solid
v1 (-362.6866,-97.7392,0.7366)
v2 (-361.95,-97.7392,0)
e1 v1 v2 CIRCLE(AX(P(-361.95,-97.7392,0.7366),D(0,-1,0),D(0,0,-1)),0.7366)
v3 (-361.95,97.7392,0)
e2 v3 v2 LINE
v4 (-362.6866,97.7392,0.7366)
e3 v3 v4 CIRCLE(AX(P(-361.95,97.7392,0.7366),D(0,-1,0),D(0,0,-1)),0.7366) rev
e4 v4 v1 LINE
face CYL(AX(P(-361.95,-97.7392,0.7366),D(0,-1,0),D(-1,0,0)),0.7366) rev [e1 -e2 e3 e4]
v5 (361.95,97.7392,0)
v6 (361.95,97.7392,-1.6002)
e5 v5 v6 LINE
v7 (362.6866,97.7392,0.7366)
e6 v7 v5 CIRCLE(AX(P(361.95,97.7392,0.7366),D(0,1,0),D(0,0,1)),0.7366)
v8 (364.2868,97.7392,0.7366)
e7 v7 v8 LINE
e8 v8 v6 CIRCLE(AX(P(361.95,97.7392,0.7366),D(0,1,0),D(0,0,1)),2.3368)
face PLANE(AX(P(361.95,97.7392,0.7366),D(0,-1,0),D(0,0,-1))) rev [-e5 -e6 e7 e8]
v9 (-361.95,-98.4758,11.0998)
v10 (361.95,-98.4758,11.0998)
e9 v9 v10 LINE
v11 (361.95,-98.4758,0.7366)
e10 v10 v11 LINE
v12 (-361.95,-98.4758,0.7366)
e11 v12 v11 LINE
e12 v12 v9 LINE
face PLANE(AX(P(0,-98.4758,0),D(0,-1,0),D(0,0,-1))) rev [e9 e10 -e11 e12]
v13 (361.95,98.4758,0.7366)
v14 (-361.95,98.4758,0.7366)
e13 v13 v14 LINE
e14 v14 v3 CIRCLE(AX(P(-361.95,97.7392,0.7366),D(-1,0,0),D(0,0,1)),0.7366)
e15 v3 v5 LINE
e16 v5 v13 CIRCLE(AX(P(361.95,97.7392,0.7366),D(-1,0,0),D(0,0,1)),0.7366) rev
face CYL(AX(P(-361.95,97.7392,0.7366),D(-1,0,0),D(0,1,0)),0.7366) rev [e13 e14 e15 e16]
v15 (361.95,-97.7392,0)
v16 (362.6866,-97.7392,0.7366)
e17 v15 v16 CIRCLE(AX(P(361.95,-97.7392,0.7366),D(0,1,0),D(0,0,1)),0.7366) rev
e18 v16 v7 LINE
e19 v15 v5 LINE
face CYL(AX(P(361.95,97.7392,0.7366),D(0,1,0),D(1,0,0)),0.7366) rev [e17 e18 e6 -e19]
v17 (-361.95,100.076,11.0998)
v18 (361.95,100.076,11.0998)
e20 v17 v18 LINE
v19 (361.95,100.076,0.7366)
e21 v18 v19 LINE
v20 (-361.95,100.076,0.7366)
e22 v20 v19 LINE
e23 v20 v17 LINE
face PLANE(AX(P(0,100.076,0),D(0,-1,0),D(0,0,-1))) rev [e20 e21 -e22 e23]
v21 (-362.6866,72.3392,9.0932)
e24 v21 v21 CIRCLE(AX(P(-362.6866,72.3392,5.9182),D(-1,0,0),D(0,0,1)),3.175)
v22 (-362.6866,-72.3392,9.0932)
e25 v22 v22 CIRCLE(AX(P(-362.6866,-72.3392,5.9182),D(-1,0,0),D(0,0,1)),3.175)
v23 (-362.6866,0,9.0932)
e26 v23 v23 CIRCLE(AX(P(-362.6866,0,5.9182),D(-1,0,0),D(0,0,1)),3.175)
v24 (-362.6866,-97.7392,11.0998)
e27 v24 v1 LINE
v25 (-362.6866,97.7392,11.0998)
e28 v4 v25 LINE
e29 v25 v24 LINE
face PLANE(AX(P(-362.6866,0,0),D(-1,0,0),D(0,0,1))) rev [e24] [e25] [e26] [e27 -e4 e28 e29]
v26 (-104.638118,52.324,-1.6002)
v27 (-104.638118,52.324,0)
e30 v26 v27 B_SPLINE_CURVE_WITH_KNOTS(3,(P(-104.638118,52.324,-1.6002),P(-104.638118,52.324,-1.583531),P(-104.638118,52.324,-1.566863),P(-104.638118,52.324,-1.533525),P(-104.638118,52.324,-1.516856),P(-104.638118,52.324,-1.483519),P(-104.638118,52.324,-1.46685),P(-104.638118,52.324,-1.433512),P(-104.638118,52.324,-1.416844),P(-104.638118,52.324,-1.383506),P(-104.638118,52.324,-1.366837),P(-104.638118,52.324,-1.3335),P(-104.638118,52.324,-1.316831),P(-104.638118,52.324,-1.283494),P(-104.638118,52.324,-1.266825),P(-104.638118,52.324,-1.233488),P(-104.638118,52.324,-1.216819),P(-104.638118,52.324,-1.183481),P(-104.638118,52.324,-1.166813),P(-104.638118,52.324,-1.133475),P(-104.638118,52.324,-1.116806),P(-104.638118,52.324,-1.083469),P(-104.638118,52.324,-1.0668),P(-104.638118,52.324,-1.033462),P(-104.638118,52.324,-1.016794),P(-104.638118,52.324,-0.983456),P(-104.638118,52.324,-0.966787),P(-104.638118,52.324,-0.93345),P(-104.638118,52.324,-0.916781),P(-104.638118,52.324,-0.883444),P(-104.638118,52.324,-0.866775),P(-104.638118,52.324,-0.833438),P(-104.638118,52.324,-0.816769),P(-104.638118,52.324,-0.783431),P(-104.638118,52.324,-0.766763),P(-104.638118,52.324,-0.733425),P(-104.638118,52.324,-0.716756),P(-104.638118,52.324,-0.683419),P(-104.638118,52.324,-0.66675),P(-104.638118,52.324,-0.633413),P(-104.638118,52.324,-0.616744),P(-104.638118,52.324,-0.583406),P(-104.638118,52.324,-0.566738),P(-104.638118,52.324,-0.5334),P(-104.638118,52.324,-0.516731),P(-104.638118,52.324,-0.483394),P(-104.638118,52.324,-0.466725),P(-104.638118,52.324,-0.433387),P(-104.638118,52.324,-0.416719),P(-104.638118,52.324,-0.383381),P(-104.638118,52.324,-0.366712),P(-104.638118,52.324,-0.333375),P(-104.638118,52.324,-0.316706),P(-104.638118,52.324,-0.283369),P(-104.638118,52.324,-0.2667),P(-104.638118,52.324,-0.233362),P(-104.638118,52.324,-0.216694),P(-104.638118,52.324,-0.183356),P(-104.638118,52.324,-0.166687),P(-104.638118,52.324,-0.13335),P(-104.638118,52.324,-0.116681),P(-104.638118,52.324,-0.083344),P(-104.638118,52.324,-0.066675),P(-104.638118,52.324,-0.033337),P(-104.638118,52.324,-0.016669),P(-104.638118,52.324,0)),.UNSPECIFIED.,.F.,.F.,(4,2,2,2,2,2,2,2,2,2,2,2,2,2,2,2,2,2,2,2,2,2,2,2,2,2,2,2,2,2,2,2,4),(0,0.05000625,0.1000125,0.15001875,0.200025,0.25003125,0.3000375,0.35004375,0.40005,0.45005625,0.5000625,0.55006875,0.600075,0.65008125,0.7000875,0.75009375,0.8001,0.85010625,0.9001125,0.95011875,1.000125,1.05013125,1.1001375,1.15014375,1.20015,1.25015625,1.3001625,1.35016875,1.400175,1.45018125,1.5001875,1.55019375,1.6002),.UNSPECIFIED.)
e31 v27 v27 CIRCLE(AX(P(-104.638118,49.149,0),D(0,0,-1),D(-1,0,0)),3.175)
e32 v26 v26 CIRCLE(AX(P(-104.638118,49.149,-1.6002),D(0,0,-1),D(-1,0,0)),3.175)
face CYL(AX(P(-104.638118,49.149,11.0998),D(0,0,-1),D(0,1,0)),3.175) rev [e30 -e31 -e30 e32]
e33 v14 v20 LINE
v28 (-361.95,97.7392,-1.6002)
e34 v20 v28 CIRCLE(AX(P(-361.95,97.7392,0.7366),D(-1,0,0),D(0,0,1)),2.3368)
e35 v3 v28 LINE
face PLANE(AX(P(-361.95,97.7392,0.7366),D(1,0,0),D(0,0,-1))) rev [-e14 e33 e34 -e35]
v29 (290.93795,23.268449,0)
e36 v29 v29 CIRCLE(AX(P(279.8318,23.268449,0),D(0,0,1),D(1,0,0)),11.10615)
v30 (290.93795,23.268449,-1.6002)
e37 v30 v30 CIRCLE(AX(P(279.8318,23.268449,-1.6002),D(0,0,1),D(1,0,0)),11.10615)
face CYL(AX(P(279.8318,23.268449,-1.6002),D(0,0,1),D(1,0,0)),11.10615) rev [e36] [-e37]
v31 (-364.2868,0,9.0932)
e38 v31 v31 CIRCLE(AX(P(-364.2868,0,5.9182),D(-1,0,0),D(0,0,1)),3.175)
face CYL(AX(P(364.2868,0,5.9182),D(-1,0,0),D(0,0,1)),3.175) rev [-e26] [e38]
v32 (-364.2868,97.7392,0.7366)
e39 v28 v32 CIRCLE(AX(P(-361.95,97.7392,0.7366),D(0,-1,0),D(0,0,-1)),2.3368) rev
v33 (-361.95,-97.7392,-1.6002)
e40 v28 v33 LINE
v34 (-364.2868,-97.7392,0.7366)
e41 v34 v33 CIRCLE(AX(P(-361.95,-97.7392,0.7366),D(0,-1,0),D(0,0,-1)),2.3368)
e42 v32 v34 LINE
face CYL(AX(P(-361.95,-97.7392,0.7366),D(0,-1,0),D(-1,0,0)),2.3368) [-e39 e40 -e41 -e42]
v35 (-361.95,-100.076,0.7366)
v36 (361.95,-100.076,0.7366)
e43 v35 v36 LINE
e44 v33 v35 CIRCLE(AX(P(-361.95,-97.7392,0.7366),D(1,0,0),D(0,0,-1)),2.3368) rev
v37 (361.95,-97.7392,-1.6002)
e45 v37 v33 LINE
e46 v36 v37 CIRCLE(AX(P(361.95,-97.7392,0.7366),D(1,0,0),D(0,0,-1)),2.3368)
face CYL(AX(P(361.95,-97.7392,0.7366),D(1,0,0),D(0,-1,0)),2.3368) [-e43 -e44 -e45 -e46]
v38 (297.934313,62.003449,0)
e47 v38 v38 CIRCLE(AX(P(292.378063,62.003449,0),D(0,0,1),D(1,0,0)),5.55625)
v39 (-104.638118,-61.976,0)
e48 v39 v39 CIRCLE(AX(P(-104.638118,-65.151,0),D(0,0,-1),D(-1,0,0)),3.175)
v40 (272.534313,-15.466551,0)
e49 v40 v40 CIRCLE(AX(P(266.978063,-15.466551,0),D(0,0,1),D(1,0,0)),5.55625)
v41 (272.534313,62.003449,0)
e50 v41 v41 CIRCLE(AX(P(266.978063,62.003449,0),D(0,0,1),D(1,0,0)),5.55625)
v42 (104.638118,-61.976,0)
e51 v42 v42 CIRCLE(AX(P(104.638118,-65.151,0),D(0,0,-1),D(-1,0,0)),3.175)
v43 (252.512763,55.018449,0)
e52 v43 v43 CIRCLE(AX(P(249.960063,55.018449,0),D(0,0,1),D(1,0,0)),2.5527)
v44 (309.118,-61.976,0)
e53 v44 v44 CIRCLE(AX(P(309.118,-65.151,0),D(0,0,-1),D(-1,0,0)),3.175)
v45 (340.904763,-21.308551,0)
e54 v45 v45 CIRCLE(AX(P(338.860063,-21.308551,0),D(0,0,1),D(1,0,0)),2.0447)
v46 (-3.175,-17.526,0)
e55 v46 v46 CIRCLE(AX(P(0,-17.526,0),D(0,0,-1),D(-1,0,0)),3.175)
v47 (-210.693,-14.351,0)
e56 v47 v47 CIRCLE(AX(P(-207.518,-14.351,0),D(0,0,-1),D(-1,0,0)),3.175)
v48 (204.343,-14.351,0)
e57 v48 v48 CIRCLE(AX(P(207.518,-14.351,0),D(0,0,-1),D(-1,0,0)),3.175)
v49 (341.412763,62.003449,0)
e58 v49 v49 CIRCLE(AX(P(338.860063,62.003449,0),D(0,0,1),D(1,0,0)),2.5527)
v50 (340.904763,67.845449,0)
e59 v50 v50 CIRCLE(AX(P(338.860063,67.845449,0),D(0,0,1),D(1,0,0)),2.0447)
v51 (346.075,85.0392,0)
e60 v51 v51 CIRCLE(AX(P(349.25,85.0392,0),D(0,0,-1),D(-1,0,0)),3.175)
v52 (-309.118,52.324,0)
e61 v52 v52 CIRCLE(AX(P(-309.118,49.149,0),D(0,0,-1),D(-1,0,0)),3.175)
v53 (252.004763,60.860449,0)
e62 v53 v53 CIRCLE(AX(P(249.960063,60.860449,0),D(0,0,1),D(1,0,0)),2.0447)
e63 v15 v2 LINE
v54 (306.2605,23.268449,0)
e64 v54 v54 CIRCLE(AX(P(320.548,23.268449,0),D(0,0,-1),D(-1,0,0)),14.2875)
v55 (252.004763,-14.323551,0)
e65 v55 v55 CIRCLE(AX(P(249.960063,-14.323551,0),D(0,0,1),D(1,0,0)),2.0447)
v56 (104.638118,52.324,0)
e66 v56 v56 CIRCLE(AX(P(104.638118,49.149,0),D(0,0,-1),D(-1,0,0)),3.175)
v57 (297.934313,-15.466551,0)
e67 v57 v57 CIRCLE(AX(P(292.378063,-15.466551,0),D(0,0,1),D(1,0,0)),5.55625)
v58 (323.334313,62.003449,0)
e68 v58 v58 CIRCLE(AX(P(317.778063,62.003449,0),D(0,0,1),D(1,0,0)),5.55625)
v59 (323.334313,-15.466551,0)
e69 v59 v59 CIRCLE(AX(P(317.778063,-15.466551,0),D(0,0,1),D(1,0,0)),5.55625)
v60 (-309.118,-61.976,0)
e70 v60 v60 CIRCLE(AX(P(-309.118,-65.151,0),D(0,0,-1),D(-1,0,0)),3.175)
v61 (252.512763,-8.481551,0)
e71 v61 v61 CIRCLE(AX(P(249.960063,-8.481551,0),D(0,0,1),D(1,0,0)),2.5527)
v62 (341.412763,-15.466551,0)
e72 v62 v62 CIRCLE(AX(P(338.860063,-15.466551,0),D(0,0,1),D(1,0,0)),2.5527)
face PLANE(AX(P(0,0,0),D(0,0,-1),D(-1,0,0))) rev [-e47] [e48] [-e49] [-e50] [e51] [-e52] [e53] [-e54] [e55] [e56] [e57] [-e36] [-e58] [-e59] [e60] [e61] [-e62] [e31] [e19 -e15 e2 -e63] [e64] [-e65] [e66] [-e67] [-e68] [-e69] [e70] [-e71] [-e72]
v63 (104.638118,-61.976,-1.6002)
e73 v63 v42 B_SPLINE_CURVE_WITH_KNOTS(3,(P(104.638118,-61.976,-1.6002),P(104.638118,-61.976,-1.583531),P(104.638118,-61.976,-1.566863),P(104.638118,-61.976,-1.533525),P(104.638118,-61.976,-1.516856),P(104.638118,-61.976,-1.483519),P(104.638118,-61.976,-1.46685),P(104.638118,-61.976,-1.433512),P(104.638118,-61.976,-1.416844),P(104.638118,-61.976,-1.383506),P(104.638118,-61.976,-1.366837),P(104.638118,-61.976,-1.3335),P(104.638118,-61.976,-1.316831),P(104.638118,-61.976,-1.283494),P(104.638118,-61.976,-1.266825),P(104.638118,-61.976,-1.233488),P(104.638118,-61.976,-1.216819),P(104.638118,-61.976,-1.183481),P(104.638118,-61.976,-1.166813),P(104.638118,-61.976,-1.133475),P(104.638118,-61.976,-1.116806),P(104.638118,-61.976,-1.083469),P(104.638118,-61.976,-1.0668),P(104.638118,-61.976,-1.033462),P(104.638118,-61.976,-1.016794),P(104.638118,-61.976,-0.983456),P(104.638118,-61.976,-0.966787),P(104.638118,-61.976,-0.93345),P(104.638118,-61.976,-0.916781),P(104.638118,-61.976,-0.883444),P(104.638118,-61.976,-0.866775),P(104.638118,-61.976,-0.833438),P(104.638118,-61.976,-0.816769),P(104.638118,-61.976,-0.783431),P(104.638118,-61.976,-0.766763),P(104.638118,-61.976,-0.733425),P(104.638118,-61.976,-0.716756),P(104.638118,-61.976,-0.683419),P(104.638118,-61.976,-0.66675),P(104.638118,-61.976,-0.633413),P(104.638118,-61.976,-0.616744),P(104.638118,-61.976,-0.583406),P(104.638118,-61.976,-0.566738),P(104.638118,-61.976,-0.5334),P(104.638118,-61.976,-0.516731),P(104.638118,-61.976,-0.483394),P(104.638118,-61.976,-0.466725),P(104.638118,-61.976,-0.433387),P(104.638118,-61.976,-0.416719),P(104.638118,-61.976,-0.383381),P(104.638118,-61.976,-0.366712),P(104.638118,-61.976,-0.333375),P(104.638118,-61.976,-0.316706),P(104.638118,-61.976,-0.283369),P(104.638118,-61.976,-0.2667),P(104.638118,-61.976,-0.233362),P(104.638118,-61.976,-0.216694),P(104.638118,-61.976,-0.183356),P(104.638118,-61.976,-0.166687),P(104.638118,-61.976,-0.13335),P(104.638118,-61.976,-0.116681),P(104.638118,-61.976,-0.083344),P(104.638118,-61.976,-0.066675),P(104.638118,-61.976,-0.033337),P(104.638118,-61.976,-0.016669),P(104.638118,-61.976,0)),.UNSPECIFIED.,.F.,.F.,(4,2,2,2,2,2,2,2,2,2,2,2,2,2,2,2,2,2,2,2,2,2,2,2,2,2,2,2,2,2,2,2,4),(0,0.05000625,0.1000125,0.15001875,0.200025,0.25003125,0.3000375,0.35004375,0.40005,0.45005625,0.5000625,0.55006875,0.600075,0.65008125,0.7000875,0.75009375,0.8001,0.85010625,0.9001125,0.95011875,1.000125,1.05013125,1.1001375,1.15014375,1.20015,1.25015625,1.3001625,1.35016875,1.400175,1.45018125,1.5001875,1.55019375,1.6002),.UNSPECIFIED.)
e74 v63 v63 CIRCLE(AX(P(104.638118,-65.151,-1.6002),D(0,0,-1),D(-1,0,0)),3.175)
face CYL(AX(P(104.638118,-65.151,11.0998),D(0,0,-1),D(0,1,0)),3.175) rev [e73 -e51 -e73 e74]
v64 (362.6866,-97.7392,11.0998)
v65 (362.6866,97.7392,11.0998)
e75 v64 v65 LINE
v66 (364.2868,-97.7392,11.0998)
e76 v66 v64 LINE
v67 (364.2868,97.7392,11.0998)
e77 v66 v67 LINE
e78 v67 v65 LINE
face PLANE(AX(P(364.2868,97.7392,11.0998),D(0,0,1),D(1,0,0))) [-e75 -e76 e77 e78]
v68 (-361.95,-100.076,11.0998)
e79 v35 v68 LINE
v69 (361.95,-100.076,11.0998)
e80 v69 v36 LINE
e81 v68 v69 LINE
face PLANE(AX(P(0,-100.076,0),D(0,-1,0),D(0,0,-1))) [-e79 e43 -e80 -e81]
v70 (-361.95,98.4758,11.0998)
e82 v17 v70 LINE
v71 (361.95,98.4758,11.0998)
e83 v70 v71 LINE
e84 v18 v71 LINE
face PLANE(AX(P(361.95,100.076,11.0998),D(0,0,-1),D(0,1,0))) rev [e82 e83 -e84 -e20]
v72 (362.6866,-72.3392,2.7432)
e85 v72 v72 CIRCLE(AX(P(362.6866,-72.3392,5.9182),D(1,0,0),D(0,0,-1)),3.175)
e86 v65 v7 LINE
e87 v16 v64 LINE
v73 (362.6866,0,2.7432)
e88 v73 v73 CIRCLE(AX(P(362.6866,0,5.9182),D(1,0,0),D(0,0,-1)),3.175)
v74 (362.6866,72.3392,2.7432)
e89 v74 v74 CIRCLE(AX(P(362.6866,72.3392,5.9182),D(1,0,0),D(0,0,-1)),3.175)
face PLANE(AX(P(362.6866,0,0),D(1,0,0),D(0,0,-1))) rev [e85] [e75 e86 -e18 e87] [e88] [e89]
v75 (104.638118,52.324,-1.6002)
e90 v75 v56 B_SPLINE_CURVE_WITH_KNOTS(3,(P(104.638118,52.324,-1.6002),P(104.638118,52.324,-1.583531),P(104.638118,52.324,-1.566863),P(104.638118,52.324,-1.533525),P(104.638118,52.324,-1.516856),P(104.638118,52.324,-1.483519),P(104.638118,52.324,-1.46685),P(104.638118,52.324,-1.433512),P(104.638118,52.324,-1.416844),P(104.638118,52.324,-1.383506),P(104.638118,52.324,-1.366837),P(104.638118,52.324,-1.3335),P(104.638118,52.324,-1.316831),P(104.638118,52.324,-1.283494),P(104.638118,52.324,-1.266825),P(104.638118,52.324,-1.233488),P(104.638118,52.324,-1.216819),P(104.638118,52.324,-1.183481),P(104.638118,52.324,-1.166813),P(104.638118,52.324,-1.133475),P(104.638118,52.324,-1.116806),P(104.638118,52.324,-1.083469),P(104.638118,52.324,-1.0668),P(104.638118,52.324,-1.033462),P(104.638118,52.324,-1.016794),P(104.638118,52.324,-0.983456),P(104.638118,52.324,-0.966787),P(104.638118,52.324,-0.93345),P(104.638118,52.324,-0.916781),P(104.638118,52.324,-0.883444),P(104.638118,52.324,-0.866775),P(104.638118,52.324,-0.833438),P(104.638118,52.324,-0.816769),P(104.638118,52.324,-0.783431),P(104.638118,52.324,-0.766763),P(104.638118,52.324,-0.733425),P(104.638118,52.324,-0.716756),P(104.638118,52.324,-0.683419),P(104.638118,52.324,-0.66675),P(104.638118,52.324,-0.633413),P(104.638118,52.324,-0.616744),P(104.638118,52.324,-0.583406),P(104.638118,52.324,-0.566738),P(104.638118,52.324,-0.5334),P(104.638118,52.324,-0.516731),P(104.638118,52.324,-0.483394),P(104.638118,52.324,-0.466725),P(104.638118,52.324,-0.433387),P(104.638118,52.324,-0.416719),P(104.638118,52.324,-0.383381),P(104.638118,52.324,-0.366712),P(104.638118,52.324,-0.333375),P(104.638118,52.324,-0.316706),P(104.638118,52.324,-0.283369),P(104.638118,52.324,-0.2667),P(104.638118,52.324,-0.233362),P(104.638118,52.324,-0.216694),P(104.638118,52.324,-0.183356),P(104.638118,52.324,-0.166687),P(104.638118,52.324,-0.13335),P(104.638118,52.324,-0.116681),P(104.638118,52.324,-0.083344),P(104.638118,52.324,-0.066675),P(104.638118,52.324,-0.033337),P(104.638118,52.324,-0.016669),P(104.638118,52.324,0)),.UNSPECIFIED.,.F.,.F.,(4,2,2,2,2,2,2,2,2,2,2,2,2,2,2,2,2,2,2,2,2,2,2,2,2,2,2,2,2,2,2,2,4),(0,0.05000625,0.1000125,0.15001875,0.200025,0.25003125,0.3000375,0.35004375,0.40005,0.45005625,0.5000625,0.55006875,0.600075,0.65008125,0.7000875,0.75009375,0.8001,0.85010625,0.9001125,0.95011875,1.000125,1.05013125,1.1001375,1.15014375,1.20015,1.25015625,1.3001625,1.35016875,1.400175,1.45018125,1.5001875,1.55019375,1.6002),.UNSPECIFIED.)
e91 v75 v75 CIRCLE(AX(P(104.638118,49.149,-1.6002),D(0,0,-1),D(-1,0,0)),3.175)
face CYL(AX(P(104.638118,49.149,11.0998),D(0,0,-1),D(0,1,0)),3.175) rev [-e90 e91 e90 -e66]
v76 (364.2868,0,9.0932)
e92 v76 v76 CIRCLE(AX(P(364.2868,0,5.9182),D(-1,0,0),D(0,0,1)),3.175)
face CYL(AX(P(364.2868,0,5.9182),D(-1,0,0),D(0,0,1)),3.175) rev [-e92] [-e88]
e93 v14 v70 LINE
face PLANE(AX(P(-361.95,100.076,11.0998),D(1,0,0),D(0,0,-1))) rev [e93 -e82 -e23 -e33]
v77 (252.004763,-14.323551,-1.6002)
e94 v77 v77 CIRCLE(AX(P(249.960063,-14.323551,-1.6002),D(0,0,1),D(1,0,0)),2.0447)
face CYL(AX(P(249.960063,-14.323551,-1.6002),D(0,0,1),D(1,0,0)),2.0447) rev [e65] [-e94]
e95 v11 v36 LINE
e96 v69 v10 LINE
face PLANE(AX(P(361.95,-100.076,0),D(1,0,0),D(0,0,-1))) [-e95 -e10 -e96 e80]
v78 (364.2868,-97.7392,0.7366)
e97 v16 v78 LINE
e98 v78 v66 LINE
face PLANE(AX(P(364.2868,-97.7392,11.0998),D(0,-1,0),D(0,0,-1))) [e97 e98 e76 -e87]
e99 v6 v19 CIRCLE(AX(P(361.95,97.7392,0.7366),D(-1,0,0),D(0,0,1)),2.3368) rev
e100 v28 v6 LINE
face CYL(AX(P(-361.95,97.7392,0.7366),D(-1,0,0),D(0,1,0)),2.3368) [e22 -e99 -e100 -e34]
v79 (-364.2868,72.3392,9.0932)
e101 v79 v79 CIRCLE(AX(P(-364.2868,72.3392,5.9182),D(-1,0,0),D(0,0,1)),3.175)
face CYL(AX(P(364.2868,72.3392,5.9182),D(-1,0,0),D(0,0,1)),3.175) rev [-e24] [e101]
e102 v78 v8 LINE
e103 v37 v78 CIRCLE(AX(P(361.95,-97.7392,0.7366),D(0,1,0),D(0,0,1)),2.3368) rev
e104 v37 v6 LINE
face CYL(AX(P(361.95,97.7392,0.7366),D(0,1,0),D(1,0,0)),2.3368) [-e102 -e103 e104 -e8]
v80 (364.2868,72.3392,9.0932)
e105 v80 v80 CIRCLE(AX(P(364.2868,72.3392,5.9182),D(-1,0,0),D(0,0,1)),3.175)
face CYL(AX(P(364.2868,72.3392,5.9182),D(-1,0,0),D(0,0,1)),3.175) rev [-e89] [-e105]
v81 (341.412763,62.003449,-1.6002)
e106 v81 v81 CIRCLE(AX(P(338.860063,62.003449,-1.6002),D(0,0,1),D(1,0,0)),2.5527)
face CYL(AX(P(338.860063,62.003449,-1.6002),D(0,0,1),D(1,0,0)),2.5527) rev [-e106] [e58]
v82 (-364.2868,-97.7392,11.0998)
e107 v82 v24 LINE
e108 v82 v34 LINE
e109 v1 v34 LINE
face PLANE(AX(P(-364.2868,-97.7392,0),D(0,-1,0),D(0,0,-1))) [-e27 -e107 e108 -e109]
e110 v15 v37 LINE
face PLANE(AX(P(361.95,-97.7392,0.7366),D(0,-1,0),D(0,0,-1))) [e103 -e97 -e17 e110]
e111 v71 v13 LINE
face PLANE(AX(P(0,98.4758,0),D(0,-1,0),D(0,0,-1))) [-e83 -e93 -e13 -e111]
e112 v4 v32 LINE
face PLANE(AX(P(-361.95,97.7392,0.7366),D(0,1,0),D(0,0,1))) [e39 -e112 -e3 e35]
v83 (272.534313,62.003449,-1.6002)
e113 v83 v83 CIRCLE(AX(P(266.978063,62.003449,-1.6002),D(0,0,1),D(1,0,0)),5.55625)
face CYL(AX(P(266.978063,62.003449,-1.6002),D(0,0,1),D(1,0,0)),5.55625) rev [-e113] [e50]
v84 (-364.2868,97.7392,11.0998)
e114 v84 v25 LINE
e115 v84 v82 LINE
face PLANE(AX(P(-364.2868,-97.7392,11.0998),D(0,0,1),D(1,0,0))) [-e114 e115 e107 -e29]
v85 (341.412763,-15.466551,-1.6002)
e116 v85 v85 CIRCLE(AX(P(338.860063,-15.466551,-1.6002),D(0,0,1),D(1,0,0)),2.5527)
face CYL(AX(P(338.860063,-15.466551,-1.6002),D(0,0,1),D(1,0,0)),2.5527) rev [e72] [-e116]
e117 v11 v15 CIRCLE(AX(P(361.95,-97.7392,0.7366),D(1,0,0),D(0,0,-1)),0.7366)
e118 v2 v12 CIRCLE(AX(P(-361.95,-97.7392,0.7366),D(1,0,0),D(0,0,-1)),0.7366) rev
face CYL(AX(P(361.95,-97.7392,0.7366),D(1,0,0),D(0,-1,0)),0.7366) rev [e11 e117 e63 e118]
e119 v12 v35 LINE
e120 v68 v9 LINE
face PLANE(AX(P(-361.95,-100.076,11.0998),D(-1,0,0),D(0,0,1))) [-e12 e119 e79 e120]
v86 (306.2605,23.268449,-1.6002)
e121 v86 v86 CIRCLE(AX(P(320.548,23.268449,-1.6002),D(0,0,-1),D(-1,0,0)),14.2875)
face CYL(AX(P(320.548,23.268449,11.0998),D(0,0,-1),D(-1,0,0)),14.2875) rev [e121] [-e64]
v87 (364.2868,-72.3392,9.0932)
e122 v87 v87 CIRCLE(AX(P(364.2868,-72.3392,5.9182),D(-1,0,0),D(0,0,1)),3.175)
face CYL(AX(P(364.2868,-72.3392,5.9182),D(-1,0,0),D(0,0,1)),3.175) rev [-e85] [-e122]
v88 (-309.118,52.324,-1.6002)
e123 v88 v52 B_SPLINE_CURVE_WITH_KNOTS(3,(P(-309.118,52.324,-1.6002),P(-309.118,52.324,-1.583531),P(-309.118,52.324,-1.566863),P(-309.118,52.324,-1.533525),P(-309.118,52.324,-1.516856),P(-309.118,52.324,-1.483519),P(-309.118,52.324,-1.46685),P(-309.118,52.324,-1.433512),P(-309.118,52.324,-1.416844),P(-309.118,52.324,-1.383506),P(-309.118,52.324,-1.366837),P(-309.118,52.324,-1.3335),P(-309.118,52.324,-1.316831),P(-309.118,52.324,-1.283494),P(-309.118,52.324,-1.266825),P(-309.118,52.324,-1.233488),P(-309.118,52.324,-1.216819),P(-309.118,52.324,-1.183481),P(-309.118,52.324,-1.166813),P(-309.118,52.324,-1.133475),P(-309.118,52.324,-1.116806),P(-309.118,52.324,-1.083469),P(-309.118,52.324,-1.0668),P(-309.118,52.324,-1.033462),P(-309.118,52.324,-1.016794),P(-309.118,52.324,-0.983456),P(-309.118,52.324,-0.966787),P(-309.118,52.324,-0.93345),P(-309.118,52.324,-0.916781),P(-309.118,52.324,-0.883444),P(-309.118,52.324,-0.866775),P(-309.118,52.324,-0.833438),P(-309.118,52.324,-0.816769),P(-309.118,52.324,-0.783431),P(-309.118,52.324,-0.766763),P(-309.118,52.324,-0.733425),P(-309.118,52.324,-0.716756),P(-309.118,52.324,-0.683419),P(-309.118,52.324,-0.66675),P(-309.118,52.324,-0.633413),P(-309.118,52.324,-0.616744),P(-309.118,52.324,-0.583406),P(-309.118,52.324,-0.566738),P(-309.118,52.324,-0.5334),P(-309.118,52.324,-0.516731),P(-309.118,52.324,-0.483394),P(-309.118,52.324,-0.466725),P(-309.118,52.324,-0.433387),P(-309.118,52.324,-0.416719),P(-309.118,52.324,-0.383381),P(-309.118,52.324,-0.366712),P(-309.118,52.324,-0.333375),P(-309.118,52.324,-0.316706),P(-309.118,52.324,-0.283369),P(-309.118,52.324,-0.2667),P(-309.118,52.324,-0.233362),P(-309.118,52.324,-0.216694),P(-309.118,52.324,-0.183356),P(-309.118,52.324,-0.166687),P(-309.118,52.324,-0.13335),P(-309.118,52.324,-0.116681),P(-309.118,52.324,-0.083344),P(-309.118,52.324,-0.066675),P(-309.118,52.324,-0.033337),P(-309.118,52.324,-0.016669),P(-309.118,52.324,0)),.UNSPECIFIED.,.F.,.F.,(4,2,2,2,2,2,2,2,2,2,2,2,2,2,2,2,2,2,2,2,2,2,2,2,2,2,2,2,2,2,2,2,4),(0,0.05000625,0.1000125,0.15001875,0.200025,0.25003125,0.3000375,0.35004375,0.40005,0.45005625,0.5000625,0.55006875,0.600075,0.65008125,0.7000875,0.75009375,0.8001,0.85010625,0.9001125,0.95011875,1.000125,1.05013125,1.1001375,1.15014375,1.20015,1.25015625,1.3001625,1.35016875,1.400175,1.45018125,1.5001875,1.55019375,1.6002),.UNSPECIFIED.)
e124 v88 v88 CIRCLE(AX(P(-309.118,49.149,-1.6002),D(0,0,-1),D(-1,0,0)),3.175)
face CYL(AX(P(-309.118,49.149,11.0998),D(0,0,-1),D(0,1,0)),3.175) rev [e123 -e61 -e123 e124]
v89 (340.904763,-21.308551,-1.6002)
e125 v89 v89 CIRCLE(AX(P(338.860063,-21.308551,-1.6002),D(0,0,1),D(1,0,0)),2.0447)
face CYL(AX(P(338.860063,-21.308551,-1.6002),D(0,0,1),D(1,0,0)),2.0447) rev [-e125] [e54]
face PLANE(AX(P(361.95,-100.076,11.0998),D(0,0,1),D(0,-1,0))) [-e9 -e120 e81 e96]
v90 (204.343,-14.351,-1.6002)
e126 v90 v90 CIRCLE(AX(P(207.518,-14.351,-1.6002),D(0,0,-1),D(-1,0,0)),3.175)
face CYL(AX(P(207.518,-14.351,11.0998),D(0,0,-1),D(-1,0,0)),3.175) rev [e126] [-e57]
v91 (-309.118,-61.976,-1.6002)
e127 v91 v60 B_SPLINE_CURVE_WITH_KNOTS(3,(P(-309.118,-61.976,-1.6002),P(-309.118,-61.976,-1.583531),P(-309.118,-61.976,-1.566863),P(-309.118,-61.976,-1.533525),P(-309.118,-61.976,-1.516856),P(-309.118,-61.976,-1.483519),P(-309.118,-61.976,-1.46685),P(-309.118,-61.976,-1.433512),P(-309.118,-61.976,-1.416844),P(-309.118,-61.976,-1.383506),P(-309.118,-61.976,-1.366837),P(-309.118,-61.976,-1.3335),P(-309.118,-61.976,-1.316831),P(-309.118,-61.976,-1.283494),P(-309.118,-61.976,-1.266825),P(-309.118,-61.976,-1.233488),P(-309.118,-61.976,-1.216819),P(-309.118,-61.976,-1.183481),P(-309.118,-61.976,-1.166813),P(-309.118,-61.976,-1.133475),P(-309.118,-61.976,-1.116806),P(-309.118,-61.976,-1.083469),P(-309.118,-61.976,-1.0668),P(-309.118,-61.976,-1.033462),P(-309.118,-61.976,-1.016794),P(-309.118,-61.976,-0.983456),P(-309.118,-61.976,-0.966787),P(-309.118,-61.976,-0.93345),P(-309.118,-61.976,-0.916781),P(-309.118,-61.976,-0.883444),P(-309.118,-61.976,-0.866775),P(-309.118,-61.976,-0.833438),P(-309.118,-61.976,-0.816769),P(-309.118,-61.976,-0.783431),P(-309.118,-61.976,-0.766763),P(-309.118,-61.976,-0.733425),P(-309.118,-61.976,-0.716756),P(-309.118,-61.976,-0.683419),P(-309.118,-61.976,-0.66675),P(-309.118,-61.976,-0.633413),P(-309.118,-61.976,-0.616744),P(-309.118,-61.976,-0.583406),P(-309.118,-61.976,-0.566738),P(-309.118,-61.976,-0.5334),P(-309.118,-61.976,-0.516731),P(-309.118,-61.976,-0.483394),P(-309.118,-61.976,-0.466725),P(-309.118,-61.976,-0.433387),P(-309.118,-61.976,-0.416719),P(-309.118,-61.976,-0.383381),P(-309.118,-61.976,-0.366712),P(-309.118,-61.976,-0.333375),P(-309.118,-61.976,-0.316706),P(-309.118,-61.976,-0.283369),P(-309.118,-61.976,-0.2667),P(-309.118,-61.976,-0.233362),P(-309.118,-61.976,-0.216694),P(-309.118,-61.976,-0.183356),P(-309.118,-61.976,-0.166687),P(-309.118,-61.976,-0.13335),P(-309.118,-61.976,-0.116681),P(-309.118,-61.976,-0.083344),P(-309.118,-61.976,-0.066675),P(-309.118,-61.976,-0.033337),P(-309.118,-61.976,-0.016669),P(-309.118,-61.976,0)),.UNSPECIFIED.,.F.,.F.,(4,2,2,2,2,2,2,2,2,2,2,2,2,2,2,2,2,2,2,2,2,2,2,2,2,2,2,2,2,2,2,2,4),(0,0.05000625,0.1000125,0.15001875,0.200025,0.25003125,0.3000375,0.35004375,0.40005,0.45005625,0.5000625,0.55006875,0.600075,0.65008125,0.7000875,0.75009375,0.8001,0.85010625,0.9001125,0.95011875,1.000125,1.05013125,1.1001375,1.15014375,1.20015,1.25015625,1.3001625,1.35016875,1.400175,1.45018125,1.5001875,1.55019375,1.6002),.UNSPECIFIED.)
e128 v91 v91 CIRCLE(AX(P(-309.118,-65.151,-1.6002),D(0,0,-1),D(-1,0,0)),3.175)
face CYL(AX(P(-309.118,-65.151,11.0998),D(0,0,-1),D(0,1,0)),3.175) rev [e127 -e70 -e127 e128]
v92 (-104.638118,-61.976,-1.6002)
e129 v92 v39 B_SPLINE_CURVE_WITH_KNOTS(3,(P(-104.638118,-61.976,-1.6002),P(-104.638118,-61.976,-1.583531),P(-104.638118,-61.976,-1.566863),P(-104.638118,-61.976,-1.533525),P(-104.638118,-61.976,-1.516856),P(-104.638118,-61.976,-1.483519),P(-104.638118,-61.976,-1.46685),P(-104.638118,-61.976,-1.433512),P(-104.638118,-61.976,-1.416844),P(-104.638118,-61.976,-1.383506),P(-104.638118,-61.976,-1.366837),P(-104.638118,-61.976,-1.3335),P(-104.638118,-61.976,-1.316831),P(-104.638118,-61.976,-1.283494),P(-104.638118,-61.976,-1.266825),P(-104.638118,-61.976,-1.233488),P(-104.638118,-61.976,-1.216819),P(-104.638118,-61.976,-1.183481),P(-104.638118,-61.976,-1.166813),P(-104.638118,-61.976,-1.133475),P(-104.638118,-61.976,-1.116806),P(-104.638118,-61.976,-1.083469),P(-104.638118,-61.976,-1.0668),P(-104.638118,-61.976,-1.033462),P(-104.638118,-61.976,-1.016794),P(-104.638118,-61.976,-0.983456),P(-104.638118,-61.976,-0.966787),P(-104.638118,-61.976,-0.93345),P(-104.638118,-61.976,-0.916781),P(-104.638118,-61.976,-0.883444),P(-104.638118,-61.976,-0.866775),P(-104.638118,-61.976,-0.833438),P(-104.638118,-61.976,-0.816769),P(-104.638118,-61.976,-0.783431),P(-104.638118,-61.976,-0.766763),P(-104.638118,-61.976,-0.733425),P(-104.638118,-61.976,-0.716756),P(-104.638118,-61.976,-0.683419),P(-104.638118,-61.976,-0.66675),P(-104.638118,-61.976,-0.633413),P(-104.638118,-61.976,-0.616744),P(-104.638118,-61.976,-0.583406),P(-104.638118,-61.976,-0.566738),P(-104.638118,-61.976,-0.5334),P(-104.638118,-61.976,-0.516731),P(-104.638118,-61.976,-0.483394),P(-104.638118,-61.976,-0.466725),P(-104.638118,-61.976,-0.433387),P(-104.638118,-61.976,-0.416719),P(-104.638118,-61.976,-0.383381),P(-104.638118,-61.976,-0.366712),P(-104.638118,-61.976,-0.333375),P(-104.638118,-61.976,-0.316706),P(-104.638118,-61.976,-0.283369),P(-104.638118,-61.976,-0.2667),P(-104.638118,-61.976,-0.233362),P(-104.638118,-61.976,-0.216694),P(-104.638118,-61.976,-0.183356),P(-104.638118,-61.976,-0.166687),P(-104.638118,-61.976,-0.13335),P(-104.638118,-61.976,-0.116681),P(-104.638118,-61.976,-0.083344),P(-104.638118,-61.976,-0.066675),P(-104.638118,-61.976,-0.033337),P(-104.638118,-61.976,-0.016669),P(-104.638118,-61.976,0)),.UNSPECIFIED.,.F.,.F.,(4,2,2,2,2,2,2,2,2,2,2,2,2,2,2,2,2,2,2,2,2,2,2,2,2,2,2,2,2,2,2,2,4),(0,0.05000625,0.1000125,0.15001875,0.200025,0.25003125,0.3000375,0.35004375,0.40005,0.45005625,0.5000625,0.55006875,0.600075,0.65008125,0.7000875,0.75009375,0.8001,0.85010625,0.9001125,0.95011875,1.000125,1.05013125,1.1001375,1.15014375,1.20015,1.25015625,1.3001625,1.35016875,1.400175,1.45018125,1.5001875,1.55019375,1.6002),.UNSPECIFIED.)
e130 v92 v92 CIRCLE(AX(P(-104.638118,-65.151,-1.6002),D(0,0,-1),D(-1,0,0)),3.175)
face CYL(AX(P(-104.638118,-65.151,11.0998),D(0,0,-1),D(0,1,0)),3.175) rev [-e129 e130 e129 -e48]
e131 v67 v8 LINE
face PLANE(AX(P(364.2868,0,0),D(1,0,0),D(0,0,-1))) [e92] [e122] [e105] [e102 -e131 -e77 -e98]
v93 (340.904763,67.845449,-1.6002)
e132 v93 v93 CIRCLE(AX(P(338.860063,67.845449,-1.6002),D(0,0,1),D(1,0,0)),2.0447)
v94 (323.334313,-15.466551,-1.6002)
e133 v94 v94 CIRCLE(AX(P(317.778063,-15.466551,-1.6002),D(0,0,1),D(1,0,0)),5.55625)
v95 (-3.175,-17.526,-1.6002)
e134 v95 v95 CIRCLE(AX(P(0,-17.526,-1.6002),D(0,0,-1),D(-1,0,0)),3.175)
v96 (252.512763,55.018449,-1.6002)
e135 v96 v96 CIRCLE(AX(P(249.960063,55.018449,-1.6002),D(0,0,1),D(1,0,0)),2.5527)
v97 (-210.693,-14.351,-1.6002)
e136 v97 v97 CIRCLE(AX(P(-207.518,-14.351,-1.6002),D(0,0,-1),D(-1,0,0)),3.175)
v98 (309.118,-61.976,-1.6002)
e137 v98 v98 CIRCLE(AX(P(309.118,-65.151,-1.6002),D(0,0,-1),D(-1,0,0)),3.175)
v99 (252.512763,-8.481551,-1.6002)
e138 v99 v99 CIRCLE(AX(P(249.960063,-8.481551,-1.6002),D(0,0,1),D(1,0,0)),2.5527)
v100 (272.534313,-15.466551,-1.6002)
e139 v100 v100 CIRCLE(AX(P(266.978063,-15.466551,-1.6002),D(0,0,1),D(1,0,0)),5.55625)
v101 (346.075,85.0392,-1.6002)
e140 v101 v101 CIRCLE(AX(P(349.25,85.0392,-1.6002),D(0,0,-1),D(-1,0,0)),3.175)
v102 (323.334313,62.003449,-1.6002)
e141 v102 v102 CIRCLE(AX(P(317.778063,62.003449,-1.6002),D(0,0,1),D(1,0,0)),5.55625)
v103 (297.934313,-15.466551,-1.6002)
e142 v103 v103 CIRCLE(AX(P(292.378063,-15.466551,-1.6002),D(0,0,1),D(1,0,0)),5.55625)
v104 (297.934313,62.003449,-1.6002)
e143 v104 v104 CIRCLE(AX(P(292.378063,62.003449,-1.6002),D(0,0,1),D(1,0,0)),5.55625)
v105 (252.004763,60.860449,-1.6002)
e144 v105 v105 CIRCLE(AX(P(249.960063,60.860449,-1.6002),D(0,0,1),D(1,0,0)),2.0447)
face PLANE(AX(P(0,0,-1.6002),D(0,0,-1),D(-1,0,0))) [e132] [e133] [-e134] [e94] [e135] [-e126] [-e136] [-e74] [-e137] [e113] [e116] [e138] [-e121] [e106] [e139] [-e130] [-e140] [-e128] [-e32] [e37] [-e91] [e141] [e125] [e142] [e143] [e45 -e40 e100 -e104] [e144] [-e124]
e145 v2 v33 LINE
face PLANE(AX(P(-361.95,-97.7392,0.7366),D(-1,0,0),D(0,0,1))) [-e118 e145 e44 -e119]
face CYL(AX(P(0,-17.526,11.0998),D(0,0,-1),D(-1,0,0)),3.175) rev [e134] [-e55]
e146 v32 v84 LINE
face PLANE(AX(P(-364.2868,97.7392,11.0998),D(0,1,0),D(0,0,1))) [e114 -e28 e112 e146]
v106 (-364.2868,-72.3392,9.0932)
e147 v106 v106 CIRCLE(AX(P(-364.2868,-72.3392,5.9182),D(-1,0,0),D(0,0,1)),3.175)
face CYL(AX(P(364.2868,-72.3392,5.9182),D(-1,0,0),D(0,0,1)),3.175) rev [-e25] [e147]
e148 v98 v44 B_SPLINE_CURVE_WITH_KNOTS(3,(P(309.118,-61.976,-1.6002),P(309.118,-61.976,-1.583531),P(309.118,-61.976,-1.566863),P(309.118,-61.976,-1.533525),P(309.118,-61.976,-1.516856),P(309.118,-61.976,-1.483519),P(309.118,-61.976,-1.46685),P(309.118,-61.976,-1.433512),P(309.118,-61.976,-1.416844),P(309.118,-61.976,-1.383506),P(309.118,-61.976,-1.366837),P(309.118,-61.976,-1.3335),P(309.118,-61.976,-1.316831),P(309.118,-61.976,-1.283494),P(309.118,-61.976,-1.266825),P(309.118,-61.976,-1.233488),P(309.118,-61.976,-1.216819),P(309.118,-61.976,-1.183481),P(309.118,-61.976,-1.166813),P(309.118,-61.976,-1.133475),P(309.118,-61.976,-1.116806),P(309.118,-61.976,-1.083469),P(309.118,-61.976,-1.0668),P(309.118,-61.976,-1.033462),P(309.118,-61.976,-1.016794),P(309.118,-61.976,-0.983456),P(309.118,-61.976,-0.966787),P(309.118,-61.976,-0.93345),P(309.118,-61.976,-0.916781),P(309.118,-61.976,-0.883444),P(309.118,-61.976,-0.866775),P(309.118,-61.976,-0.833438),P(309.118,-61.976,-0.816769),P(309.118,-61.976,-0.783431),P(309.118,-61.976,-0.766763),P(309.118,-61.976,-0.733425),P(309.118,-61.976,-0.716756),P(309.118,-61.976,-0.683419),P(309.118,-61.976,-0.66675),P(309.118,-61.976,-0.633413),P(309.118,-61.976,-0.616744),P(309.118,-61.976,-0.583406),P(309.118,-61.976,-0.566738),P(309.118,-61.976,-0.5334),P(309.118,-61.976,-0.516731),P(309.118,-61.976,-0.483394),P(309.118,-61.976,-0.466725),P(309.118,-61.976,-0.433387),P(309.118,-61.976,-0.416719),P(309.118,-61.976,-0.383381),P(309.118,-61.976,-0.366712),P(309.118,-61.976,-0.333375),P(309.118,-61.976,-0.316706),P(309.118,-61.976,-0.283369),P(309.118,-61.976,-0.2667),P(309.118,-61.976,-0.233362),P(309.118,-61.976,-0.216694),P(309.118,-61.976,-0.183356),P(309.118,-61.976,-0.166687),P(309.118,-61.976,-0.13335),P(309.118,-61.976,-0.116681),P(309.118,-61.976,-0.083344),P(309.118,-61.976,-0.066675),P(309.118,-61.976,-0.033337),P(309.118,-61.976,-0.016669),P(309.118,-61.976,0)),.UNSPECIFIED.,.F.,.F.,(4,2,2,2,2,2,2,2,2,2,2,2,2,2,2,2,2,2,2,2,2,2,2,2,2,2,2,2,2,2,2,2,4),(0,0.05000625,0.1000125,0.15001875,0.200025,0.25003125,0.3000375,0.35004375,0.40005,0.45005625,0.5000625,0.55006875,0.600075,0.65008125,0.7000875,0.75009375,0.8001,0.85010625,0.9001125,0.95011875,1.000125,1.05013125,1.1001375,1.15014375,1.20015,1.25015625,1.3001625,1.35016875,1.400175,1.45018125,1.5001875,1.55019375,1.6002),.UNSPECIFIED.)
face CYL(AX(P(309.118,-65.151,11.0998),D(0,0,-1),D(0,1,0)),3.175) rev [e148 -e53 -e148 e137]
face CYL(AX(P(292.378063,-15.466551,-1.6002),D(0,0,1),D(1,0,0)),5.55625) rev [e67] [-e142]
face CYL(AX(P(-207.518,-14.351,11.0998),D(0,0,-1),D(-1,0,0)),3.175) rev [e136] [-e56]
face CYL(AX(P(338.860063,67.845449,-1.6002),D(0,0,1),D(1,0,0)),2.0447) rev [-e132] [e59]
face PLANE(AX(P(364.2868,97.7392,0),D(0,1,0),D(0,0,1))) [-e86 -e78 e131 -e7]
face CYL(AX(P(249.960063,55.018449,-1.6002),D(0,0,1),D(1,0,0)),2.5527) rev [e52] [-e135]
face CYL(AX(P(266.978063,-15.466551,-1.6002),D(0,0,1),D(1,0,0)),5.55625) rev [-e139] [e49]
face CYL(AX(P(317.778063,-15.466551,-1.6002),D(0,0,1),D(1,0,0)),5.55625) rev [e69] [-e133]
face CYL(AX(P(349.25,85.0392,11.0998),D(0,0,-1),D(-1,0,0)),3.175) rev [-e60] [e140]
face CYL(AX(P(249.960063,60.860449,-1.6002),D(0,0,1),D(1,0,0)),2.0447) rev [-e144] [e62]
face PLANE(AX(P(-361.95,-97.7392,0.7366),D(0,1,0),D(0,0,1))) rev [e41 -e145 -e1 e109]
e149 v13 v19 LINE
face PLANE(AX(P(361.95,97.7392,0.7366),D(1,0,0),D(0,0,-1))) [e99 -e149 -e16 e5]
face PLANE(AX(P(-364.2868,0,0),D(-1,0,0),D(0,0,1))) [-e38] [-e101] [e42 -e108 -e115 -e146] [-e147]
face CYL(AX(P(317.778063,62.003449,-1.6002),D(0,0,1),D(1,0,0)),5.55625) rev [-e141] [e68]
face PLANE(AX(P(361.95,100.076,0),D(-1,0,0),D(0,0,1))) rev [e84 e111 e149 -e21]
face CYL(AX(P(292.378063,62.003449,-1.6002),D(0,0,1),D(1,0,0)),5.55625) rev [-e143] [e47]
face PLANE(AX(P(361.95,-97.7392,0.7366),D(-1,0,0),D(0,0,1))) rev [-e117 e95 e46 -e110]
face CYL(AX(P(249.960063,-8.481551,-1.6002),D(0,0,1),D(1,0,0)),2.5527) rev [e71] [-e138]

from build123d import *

# Parameters (mm, degrees)
SKETCH1_W                    = 723.9
SKETCH1_H                    = 200.152
BASE_FLANGE1_DEPTH           = 1.6002
EDGE_FLANGE1_STRIP_W         = 7.874
EDGE_FLANGE1_STRIP_H         = 1.6002
EDGE_FLANGE1_STRIP_CUT_DEPTH = 723.9
EDGE_FLANGE1_DEPTH           = 723.9
EDGE_FLANGE2_STRIP_W         = 7.874
EDGE_FLANGE2_STRIP_H         = 1.6002
EDGE_FLANGE2_STRIP_CUT_DEPTH = 723.9
EDGE_FLANGE2_DEPTH           = 723.9
SKETCH12_R                   = 3.175
SKETCH12_R_2                 = 14.2875
CUT_EXTRUDE1_DEPTH           = 376.744991019
SKETCH13_R                   = 3.175
CUT_EXTRUDE2_DEPTH           = 395.072064437
EDGE_FLANGE3_DEPTH           = 195.4784
EDGE_FLANGE3_BEND_DEPTH      = 195.4784
SKETCH20_R                   = 3.175
CUT_EXTRUDE3_DEPTH           = 736.498403773
SKETCH22_R                   = 5.55625
SKETCH22_R_2                 = 2.5527
SKETCH22_R_3                 = 2.0447
SKETCH22_R_4                 = 11.10615
CUT_EXTRUDE4_DEPTH           = 378.946139007
SKETCH23_R                   = 3.175
CUT_EXTRUDE5_DEPTH           = 378.996519072


# Sheet-metal steps are written as plain solids
with BuildPart() as part:
    # Base-Flange1: sheet metal written as solids
    # Sketch1 → Base-Flange1 (new body)
    with BuildSketch(Plane.XY):
        Rectangle(SKETCH1_W, SKETCH1_H)
    extrude(amount=-BASE_FLANGE1_DEPTH)

    # Edge-Flange1: sheet metal written as solids
    # Edge-Flange1 strip (on a plane across the edge) → Edge-Flange1 strip cut (cut)
    with BuildSketch(Plane(origin=(361.95, 100.076, 0), x_dir=(0, -1, 0), z_dir=(-1, 0, 0))):
        with Locations((-1.6002, -0.8001)):
            Rectangle(EDGE_FLANGE1_STRIP_W, EDGE_FLANGE1_STRIP_H)
    extrude(amount=EDGE_FLANGE1_STRIP_CUT_DEPTH, mode=Mode.SUBTRACT)

    # Edge-Flange1 section (on a plane across the edge) → Edge-Flange1 (add)
    with BuildSketch(Plane(origin=(361.95, 100.076, 0), x_dir=(0, -1, 0), z_dir=(-1, 0, 0))):
        with BuildLine():
            Line((0, 0.7366), (0, 11.0998))
            Line((0, 11.0998), (1.6002, 11.0998))
            Line((1.6002, 11.0998), (1.6002, 0.7366))
            ThreePointArc((1.6002, 0.7366), (1.815945145, 0.215745145), (2.3368, 0))
            Line((2.3368, 0), (2.3368, -1.6002))
            ThreePointArc((2.3368, -1.6002), (0.684432874, -0.915767126), (0, 0.7366))
        make_face()
    extrude(amount=EDGE_FLANGE1_DEPTH)

    # Edge-Flange2: sheet metal written as solids
    # Edge-Flange2 strip (on a plane across the edge) → Edge-Flange2 strip cut (cut)
    with BuildSketch(Plane(origin=(-361.95, -100.076, 0), x_dir=(0, 1, 0), z_dir=(1, 0, 0))):
        with Locations((-1.6002, -0.8001)):
            Rectangle(EDGE_FLANGE2_STRIP_W, EDGE_FLANGE2_STRIP_H)
    extrude(amount=EDGE_FLANGE2_STRIP_CUT_DEPTH, mode=Mode.SUBTRACT)

    # Edge-Flange2 section (on a plane across the edge) → Edge-Flange2 (add)
    with BuildSketch(Plane(origin=(-361.95, -100.076, 0), x_dir=(0, 1, 0), z_dir=(1, 0, 0))):
        with BuildLine():
            Line((0, 0.7366), (0, 11.0998))
            Line((0, 11.0998), (1.6002, 11.0998))
            Line((1.6002, 11.0998), (1.6002, 0.7366))
            ThreePointArc((1.6002, 0.7366), (1.815945145, 0.215745145), (2.3368, 0))
            Line((2.3368, 0), (2.3368, -1.6002))
            ThreePointArc((2.3368, -1.6002), (0.684432874, -0.915767126), (0, 0.7366))
        make_face()
    extrude(amount=EDGE_FLANGE2_DEPTH)

    # Sketch12 → Cut-Extrude1 (cut, through all)
    with BuildSketch(Plane(origin=(0, 0, -1.6002), x_dir=(-1, 0, 0), z_dir=(0, 0, -1))):
        with Locations((-207.518, -14.351)):
            Circle(SKETCH12_R)
        with Locations((0, -17.526)):
            Circle(SKETCH12_R)
        with Locations((207.518, -14.351)):
            Circle(SKETCH12_R)
        with Locations((-320.548, 23.268449438)):
            Circle(SKETCH12_R_2)
    extrude(amount=-CUT_EXTRUDE1_DEPTH, mode=Mode.SUBTRACT)

    # Sketch13 → Cut-Extrude2 (cut, through all)
    with BuildSketch(Plane(origin=(0, 0, -108.356399896), x_dir=(-1, 0, 0), z_dir=(0, 0, -1))):
        with Locations(Location((-309.118, -65.151, 0), (0, 0, 90))):
            Circle(SKETCH13_R)
        with Locations(Location((-104.638118017, -65.151, 0), (0, 0, 90))):
            Circle(SKETCH13_R)
        with Locations(Location((-104.638118017, 49.149, 0), (0, 0, 90))):
            Circle(SKETCH13_R)
        with Locations(Location((104.638118017, 49.149, 0), (0, 0, 90))):
            Circle(SKETCH13_R)
        with Locations(Location((104.638118017, -65.151, 0), (0, 0, 90))):
            Circle(SKETCH13_R)
        with Locations(Location((309.118, -65.151, 0), (0, 0, 90))):
            Circle(SKETCH13_R)
        with Locations(Location((309.118, 49.149, 0), (0, 0, 90))):
            Circle(SKETCH13_R)
    extrude(amount=-CUT_EXTRUDE2_DEPTH, mode=Mode.SUBTRACT)

    # Edge-Flange3: sheet metal written as solids
    # Edge-Flange3 section (on a plane across the edge) → Edge-Flange3 (add)
    with BuildSketch(Plane(origin=(-362.6866, 97.7392, 0), x_dir=(1, 0, 0), z_dir=(0, -1, 0))):
        with BuildLine():
            Line((-1.6002, 0.7366), (-1.6002, 11.0998))
            Line((-1.6002, 11.0998), (0, 11.0998))
            Line((0, 11.0998), (0, 0.7366))
            ThreePointArc((0, 0.7366), (0.215745145, 0.215745145), (0.7366, 0))
            Line((0.7366, 0), (0.7366, -1.6002))
            ThreePointArc((0.7366, -1.6002), (-0.915767126, -0.915767126), (-1.6002, 0.7366))
        make_face()
    extrude(amount=EDGE_FLANGE3_DEPTH)

    # Edge-Flange3 section 2 (on a plane across the edge) → Edge-Flange3 bend (add)
    with BuildSketch(Plane(origin=(362.6866, -97.7392, 0), x_dir=(-1, 0, 0), z_dir=(0, 1, 0))):
        with BuildLine():
            Line((-1.6002, 0.7366), (-1.6002, 11.0998))
            Line((-1.6002, 11.0998), (0, 11.0998))
            Line((0, 11.0998), (0, 0.7366))
            ThreePointArc((0, 0.7366), (0.215745145, 0.215745145), (0.7366, 0))
            Line((0.7366, 0), (0.7366, -1.6002))
            ThreePointArc((0.7366, -1.6002), (-0.915767126, -0.915767126), (-1.6002, 0.7366))
        make_face()
    extrude(amount=EDGE_FLANGE3_BEND_DEPTH)

    # Sketch20 → Cut-Extrude3 (cut, through all)
    with BuildSketch(Plane.ZY.offset(364.2868)):
        with Locations((5.9182, 72.3392)):
            Circle(SKETCH20_R)
        with Locations((5.9182, 0)):
            Circle(SKETCH20_R)
        with Locations((5.9182, -72.3392)):
            Circle(SKETCH20_R)
    extrude(amount=-CUT_EXTRUDE3_DEPTH, mode=Mode.SUBTRACT)

    # Sketch22 → Cut-Extrude4 (cut, through all)
    with BuildSketch(Plane.XY):
        with Locations((266.978063087, -15.466550562)):
            Circle(SKETCH22_R)
        with Locations((249.960063087, -8.481550562)):
            Circle(SKETCH22_R_2)
        with Locations((249.960063087, -14.323550562)):
            Circle(SKETCH22_R_3)
        with Locations((249.960063087, 55.018449438)):
            Circle(SKETCH22_R_2)
        with Locations((249.960063087, 60.860449438)):
            Circle(SKETCH22_R_3)
        with Locations((266.978063087, 62.003449438)):
            Circle(SKETCH22_R)
        with Locations((292.378063087, 62.003449438)):
            Circle(SKETCH22_R)
        with Locations((317.778063087, 62.003449438)):
            Circle(SKETCH22_R)
        with Locations((338.860063087, 62.003449438)):
            Circle(SKETCH22_R_2)
        with Locations((338.860063087, 67.845449438)):
            Circle(SKETCH22_R_3)
        with Locations((338.860063087, -15.466550562)):
            Circle(SKETCH22_R_2)
        with Locations((338.860063087, -21.308550562)):
            Circle(SKETCH22_R_3)
        with Locations((279.8318, 23.268449438)):
            Circle(SKETCH22_R_4)
        with Locations((292.378063087, -15.466550562)):
            Circle(SKETCH22_R)
        with Locations((317.778063087, -15.466550562)):
            Circle(SKETCH22_R)
    extrude(amount=-CUT_EXTRUDE4_DEPTH, mode=Mode.SUBTRACT)

    # Sketch23 → Cut-Extrude5 (cut, through all)
    with BuildSketch(Plane(origin=(0, 0, -1.6002), x_dir=(-1, 0, 0), z_dir=(0, 0, -1))):
        with Locations((-349.25, 85.0392)):
            Circle(SKETCH23_R)
    extrude(amount=-CUT_EXTRUDE5_DEPTH, mode=Mode.SUBTRACT)


solid = part.part
